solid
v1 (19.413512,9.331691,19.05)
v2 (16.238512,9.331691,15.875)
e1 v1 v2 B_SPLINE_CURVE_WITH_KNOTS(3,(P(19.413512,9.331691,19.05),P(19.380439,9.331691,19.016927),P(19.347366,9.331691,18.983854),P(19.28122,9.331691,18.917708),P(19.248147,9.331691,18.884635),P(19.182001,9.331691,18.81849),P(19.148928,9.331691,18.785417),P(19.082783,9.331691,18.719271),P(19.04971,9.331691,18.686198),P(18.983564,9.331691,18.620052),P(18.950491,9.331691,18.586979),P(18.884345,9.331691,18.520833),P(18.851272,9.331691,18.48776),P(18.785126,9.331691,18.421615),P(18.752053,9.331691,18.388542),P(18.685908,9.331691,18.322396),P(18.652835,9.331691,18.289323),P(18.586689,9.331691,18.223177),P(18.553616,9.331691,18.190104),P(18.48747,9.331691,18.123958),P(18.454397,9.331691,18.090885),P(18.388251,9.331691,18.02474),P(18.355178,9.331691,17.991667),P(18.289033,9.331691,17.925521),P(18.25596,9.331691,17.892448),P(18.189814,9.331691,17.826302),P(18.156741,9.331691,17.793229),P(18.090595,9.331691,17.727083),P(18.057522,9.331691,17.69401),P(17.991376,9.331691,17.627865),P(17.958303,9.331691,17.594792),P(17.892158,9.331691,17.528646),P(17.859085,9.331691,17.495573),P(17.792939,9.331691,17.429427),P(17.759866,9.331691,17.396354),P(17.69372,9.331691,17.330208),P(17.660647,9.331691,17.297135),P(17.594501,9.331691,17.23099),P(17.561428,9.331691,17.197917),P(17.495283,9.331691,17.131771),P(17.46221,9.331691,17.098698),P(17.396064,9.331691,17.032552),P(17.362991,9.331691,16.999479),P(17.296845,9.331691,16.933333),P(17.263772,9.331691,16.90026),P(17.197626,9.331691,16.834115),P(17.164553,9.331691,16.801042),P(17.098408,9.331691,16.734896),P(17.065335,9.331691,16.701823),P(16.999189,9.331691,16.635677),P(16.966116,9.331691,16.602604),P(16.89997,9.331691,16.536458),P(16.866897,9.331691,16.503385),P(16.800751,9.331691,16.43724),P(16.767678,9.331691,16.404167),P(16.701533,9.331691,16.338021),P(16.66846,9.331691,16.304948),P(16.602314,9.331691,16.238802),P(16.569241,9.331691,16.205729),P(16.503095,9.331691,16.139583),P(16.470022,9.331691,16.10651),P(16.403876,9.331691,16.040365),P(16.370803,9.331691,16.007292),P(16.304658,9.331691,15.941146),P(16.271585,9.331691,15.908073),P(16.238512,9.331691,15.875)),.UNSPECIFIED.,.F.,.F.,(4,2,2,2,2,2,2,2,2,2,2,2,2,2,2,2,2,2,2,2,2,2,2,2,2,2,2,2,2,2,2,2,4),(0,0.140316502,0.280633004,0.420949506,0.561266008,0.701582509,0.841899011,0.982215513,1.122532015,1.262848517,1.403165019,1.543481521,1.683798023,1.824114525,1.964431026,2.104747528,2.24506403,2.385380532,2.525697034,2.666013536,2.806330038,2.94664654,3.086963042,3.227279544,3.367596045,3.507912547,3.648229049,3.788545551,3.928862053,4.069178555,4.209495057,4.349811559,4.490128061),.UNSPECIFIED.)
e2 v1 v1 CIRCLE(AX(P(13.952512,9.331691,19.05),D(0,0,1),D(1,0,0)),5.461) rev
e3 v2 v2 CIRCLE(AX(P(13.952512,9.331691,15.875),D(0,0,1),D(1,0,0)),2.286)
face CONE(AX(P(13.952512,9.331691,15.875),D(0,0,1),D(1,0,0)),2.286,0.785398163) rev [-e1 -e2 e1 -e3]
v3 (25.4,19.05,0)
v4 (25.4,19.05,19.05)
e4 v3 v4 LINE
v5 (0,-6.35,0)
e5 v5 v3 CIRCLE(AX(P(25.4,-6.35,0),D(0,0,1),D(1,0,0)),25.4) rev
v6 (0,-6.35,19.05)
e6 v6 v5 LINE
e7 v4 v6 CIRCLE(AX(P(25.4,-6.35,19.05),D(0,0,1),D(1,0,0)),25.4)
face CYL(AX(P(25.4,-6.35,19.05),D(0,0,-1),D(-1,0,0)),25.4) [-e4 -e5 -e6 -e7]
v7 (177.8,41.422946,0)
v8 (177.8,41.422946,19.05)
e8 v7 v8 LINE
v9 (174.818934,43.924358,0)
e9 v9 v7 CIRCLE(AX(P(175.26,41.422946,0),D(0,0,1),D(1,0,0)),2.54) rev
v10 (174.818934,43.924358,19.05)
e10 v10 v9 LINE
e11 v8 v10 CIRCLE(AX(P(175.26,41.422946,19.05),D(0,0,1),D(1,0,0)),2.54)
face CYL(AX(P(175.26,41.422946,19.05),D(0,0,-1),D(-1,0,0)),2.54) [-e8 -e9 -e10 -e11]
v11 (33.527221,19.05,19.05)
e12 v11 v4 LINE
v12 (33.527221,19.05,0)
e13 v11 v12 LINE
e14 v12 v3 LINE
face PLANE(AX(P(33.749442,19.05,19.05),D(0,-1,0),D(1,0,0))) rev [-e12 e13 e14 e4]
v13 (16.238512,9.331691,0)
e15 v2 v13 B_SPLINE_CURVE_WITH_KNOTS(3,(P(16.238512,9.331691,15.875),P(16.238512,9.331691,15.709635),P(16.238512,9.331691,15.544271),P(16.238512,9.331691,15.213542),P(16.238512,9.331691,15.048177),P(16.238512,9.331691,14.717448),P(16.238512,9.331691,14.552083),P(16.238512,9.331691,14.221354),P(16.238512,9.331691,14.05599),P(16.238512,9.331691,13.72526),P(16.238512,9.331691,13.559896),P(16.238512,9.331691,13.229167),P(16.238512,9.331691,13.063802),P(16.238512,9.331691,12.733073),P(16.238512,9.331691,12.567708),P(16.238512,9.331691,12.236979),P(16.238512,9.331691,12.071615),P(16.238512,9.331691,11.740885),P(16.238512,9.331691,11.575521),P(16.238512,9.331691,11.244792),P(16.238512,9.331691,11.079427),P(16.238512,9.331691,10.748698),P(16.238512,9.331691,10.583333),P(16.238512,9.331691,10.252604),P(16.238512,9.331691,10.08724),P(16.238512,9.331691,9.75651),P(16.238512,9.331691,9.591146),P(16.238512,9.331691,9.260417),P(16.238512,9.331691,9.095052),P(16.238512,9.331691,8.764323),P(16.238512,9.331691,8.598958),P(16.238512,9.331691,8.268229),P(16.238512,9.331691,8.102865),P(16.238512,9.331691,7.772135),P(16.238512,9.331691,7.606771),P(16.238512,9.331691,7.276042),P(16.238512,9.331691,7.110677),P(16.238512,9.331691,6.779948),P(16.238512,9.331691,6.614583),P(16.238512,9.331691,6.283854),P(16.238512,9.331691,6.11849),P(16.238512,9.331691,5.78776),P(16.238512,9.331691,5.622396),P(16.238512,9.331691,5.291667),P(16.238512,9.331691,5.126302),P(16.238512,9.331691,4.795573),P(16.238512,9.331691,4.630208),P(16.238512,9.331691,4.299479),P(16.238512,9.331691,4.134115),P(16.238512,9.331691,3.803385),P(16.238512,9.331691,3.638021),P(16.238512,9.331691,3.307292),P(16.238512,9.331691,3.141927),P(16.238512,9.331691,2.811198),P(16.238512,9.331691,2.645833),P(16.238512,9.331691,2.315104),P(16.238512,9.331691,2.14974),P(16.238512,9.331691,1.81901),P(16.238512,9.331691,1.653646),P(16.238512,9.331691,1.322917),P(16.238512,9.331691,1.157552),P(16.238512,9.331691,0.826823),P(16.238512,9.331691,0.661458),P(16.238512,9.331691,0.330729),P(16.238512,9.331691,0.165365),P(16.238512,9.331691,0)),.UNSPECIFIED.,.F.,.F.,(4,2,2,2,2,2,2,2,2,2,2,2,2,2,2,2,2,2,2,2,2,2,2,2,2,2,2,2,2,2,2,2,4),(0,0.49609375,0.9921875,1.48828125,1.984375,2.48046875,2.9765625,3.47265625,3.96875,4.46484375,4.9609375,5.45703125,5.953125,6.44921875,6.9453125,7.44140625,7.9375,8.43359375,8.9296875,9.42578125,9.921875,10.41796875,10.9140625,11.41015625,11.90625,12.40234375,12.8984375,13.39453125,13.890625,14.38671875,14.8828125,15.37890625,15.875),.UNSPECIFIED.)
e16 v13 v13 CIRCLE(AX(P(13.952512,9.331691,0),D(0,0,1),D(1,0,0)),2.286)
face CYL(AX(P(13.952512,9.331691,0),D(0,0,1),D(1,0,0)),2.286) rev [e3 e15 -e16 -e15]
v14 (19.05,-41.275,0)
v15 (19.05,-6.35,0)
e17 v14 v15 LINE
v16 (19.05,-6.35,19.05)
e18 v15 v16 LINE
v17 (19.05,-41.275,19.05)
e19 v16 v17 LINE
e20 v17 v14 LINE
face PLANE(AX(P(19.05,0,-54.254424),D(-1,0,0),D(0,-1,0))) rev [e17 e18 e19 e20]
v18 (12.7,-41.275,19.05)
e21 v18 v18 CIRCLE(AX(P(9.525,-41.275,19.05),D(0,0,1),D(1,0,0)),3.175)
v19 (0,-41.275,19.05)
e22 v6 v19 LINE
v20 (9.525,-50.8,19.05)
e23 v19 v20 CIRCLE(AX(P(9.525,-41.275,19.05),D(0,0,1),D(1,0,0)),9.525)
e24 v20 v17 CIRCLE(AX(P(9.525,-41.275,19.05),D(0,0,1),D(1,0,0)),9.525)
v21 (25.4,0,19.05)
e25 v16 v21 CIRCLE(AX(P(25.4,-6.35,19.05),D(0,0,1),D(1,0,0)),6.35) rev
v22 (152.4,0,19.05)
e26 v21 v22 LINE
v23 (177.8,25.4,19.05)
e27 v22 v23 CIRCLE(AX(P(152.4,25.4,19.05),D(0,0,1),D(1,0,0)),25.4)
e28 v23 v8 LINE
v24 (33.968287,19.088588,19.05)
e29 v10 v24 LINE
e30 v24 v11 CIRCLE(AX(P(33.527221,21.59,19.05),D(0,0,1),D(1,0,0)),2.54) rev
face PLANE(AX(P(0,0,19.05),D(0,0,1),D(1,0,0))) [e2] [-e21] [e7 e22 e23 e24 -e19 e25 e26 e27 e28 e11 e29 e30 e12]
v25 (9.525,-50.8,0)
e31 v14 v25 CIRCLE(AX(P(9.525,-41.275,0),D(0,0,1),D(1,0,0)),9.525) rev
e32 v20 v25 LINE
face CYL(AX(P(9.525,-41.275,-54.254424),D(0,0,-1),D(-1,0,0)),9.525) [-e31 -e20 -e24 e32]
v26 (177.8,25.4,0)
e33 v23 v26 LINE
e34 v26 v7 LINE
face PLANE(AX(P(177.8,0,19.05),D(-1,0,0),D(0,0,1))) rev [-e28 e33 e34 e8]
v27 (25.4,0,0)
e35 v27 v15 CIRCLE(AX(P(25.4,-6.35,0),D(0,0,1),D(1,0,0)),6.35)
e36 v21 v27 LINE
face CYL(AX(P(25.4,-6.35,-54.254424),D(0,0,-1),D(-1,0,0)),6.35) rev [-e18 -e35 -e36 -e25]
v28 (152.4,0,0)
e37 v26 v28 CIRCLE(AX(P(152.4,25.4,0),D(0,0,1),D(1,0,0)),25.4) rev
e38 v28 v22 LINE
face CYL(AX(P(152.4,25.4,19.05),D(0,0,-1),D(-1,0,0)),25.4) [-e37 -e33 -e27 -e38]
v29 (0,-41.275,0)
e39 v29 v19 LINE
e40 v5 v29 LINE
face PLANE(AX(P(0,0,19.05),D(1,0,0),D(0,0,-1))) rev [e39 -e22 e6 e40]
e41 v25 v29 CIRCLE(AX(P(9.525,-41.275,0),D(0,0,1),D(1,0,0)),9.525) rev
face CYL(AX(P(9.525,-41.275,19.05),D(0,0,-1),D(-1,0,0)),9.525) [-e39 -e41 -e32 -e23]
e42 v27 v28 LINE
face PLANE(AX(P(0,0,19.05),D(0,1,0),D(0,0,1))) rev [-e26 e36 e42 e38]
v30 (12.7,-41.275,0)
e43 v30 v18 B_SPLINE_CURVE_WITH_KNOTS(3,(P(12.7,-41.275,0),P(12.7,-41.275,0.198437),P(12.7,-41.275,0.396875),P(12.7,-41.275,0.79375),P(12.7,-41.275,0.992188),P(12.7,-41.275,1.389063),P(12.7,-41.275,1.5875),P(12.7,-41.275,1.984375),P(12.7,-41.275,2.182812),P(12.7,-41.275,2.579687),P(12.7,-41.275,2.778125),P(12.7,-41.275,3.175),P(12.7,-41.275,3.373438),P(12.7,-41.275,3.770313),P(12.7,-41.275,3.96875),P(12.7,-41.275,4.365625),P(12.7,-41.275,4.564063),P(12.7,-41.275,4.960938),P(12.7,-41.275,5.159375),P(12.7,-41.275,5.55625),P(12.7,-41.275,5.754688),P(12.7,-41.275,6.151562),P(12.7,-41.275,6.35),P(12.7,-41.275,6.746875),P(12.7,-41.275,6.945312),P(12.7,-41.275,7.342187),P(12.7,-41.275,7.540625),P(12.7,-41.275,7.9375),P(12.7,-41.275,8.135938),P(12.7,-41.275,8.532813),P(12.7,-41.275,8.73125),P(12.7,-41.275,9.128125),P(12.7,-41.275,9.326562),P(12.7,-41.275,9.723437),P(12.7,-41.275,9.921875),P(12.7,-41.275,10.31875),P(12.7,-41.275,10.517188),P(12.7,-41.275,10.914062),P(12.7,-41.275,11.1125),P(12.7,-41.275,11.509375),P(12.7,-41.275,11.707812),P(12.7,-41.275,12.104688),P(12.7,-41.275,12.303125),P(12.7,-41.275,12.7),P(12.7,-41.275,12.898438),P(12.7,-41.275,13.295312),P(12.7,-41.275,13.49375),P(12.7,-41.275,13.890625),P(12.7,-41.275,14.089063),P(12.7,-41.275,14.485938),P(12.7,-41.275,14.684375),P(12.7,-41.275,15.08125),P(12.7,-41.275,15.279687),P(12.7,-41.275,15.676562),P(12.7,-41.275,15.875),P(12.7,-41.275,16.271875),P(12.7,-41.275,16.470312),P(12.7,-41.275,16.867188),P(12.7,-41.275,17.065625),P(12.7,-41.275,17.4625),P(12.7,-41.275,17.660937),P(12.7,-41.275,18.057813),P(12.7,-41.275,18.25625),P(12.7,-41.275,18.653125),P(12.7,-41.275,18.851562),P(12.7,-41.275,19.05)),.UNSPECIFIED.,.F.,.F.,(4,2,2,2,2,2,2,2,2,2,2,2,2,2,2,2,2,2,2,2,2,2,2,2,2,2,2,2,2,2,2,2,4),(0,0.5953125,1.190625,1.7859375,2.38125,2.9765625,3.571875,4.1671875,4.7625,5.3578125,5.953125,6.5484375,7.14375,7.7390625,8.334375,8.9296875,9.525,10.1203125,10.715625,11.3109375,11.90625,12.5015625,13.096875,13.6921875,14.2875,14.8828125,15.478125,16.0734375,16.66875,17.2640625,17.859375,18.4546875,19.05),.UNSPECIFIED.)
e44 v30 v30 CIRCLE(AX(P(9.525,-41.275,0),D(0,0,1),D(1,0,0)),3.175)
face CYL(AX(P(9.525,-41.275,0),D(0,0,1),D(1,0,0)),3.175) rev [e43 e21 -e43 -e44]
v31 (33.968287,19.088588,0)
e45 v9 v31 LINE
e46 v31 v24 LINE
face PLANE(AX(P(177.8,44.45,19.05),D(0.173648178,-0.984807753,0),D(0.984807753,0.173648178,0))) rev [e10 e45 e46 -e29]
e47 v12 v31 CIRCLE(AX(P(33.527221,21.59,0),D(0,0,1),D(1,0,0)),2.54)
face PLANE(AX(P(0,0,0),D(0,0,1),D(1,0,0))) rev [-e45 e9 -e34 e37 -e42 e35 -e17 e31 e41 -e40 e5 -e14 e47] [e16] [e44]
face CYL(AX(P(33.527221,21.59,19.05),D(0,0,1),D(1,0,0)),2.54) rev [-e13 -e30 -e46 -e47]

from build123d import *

# Parameters (mm, degrees)
BOSS_EXTRUDE1_DEPTH = 19.05
SKETCH4_W           = 19.05
SKETCH4_H           = 50.8
BOSS_EXTRUDE2_DEPTH = 19.05
FILLET1_R           = 2.54
SKETCH2_R           = 3.175
CUT_EXTRUDE1_DEPTH  = 186.893470837
FILLET2_R           = 25.4
FILLET3_R           = 25.4
FILLET4_R           = 6.35
FILLET5_R           = 9.525
SKETCH6_R           = 2.286
CUT_EXTRUDE3_DEPTH  = 186.893470837
CHAMFER1_SIZE       = 3.175


with BuildPart() as part:
    # Sketch1 → Boss-Extrude1 (new body)
    with BuildSketch(Plane.XY):
        Polygon((0, 0), (177.8, 0), (177.8, 44.45), (33.749441782, 19.05), (0, 19.05), align=None)
    extrude(amount=BOSS_EXTRUDE1_DEPTH)

    # Sketch4 → Boss-Extrude2 (add)
    with BuildSketch(Plane.XY.offset(19.05)):
        with Locations((9.525, -25.4)):
            Rectangle(SKETCH4_W, SKETCH4_H)
    extrude(amount=-BOSS_EXTRUDE2_DEPTH)

    # Fillet1
    fillet1_edges = [part.edges().sort_by_distance(p)[0] for p in [
        (33.749441782, 19.05, 9.525),
        (177.8, 44.45, 9.525),
    ]]
    fillet(fillet1_edges, radius=FILLET1_R)

    # Sketch2 → Cut-Extrude1 (cut, through all)
    with BuildSketch(Plane.XY.offset(19.05)):
        with Locations((9.525, -41.275)):
            Circle(SKETCH2_R)
    extrude(amount=-CUT_EXTRUDE1_DEPTH, mode=Mode.SUBTRACT)

    # Fillet2
    fillet2_edges = [part.edges().sort_by_distance(p)[0] for p in [
        (177.8, 0, 9.525),
    ]]
    fillet(fillet2_edges, radius=FILLET2_R)

    # Fillet3
    fillet3_edges = [part.edges().sort_by_distance(p)[0] for p in [
        (0, 19.05, 9.525),
    ]]
    fillet(fillet3_edges, radius=FILLET3_R)

    # Fillet4
    fillet4_edges = [part.edges().sort_by_distance(p)[0] for p in [
        (19.05, 0, 9.525),
    ]]
    fillet(fillet4_edges, radius=FILLET4_R)

    # Fillet5
    fillet5_edges = [part.edges().sort_by_distance(p)[0] for p in [
        (19.05, -50.8, 9.525),
        (0, -50.8, 9.525),
    ]]
    fillet(fillet5_edges, radius=FILLET5_R - 0.0001)  # a hair under: the kernel refuses the full size

    # Sketch6 → Cut-Extrude3 (cut, through all)
    with BuildSketch(Plane.XY.offset(19.05)):
        with Locations((13.952511732, 9.331690663)):
            Circle(SKETCH6_R)
    extrude(amount=-CUT_EXTRUDE3_DEPTH, mode=Mode.SUBTRACT)

    # Chamfer1
    chamfer1_edges = [part.edges().sort_by_distance(p)[0] for p in [
        (11.666511732, 9.331690663, 19.05),
    ]]
    chamfer(chamfer1_edges, length=CHAMFER1_SIZE)


solid = part.part
